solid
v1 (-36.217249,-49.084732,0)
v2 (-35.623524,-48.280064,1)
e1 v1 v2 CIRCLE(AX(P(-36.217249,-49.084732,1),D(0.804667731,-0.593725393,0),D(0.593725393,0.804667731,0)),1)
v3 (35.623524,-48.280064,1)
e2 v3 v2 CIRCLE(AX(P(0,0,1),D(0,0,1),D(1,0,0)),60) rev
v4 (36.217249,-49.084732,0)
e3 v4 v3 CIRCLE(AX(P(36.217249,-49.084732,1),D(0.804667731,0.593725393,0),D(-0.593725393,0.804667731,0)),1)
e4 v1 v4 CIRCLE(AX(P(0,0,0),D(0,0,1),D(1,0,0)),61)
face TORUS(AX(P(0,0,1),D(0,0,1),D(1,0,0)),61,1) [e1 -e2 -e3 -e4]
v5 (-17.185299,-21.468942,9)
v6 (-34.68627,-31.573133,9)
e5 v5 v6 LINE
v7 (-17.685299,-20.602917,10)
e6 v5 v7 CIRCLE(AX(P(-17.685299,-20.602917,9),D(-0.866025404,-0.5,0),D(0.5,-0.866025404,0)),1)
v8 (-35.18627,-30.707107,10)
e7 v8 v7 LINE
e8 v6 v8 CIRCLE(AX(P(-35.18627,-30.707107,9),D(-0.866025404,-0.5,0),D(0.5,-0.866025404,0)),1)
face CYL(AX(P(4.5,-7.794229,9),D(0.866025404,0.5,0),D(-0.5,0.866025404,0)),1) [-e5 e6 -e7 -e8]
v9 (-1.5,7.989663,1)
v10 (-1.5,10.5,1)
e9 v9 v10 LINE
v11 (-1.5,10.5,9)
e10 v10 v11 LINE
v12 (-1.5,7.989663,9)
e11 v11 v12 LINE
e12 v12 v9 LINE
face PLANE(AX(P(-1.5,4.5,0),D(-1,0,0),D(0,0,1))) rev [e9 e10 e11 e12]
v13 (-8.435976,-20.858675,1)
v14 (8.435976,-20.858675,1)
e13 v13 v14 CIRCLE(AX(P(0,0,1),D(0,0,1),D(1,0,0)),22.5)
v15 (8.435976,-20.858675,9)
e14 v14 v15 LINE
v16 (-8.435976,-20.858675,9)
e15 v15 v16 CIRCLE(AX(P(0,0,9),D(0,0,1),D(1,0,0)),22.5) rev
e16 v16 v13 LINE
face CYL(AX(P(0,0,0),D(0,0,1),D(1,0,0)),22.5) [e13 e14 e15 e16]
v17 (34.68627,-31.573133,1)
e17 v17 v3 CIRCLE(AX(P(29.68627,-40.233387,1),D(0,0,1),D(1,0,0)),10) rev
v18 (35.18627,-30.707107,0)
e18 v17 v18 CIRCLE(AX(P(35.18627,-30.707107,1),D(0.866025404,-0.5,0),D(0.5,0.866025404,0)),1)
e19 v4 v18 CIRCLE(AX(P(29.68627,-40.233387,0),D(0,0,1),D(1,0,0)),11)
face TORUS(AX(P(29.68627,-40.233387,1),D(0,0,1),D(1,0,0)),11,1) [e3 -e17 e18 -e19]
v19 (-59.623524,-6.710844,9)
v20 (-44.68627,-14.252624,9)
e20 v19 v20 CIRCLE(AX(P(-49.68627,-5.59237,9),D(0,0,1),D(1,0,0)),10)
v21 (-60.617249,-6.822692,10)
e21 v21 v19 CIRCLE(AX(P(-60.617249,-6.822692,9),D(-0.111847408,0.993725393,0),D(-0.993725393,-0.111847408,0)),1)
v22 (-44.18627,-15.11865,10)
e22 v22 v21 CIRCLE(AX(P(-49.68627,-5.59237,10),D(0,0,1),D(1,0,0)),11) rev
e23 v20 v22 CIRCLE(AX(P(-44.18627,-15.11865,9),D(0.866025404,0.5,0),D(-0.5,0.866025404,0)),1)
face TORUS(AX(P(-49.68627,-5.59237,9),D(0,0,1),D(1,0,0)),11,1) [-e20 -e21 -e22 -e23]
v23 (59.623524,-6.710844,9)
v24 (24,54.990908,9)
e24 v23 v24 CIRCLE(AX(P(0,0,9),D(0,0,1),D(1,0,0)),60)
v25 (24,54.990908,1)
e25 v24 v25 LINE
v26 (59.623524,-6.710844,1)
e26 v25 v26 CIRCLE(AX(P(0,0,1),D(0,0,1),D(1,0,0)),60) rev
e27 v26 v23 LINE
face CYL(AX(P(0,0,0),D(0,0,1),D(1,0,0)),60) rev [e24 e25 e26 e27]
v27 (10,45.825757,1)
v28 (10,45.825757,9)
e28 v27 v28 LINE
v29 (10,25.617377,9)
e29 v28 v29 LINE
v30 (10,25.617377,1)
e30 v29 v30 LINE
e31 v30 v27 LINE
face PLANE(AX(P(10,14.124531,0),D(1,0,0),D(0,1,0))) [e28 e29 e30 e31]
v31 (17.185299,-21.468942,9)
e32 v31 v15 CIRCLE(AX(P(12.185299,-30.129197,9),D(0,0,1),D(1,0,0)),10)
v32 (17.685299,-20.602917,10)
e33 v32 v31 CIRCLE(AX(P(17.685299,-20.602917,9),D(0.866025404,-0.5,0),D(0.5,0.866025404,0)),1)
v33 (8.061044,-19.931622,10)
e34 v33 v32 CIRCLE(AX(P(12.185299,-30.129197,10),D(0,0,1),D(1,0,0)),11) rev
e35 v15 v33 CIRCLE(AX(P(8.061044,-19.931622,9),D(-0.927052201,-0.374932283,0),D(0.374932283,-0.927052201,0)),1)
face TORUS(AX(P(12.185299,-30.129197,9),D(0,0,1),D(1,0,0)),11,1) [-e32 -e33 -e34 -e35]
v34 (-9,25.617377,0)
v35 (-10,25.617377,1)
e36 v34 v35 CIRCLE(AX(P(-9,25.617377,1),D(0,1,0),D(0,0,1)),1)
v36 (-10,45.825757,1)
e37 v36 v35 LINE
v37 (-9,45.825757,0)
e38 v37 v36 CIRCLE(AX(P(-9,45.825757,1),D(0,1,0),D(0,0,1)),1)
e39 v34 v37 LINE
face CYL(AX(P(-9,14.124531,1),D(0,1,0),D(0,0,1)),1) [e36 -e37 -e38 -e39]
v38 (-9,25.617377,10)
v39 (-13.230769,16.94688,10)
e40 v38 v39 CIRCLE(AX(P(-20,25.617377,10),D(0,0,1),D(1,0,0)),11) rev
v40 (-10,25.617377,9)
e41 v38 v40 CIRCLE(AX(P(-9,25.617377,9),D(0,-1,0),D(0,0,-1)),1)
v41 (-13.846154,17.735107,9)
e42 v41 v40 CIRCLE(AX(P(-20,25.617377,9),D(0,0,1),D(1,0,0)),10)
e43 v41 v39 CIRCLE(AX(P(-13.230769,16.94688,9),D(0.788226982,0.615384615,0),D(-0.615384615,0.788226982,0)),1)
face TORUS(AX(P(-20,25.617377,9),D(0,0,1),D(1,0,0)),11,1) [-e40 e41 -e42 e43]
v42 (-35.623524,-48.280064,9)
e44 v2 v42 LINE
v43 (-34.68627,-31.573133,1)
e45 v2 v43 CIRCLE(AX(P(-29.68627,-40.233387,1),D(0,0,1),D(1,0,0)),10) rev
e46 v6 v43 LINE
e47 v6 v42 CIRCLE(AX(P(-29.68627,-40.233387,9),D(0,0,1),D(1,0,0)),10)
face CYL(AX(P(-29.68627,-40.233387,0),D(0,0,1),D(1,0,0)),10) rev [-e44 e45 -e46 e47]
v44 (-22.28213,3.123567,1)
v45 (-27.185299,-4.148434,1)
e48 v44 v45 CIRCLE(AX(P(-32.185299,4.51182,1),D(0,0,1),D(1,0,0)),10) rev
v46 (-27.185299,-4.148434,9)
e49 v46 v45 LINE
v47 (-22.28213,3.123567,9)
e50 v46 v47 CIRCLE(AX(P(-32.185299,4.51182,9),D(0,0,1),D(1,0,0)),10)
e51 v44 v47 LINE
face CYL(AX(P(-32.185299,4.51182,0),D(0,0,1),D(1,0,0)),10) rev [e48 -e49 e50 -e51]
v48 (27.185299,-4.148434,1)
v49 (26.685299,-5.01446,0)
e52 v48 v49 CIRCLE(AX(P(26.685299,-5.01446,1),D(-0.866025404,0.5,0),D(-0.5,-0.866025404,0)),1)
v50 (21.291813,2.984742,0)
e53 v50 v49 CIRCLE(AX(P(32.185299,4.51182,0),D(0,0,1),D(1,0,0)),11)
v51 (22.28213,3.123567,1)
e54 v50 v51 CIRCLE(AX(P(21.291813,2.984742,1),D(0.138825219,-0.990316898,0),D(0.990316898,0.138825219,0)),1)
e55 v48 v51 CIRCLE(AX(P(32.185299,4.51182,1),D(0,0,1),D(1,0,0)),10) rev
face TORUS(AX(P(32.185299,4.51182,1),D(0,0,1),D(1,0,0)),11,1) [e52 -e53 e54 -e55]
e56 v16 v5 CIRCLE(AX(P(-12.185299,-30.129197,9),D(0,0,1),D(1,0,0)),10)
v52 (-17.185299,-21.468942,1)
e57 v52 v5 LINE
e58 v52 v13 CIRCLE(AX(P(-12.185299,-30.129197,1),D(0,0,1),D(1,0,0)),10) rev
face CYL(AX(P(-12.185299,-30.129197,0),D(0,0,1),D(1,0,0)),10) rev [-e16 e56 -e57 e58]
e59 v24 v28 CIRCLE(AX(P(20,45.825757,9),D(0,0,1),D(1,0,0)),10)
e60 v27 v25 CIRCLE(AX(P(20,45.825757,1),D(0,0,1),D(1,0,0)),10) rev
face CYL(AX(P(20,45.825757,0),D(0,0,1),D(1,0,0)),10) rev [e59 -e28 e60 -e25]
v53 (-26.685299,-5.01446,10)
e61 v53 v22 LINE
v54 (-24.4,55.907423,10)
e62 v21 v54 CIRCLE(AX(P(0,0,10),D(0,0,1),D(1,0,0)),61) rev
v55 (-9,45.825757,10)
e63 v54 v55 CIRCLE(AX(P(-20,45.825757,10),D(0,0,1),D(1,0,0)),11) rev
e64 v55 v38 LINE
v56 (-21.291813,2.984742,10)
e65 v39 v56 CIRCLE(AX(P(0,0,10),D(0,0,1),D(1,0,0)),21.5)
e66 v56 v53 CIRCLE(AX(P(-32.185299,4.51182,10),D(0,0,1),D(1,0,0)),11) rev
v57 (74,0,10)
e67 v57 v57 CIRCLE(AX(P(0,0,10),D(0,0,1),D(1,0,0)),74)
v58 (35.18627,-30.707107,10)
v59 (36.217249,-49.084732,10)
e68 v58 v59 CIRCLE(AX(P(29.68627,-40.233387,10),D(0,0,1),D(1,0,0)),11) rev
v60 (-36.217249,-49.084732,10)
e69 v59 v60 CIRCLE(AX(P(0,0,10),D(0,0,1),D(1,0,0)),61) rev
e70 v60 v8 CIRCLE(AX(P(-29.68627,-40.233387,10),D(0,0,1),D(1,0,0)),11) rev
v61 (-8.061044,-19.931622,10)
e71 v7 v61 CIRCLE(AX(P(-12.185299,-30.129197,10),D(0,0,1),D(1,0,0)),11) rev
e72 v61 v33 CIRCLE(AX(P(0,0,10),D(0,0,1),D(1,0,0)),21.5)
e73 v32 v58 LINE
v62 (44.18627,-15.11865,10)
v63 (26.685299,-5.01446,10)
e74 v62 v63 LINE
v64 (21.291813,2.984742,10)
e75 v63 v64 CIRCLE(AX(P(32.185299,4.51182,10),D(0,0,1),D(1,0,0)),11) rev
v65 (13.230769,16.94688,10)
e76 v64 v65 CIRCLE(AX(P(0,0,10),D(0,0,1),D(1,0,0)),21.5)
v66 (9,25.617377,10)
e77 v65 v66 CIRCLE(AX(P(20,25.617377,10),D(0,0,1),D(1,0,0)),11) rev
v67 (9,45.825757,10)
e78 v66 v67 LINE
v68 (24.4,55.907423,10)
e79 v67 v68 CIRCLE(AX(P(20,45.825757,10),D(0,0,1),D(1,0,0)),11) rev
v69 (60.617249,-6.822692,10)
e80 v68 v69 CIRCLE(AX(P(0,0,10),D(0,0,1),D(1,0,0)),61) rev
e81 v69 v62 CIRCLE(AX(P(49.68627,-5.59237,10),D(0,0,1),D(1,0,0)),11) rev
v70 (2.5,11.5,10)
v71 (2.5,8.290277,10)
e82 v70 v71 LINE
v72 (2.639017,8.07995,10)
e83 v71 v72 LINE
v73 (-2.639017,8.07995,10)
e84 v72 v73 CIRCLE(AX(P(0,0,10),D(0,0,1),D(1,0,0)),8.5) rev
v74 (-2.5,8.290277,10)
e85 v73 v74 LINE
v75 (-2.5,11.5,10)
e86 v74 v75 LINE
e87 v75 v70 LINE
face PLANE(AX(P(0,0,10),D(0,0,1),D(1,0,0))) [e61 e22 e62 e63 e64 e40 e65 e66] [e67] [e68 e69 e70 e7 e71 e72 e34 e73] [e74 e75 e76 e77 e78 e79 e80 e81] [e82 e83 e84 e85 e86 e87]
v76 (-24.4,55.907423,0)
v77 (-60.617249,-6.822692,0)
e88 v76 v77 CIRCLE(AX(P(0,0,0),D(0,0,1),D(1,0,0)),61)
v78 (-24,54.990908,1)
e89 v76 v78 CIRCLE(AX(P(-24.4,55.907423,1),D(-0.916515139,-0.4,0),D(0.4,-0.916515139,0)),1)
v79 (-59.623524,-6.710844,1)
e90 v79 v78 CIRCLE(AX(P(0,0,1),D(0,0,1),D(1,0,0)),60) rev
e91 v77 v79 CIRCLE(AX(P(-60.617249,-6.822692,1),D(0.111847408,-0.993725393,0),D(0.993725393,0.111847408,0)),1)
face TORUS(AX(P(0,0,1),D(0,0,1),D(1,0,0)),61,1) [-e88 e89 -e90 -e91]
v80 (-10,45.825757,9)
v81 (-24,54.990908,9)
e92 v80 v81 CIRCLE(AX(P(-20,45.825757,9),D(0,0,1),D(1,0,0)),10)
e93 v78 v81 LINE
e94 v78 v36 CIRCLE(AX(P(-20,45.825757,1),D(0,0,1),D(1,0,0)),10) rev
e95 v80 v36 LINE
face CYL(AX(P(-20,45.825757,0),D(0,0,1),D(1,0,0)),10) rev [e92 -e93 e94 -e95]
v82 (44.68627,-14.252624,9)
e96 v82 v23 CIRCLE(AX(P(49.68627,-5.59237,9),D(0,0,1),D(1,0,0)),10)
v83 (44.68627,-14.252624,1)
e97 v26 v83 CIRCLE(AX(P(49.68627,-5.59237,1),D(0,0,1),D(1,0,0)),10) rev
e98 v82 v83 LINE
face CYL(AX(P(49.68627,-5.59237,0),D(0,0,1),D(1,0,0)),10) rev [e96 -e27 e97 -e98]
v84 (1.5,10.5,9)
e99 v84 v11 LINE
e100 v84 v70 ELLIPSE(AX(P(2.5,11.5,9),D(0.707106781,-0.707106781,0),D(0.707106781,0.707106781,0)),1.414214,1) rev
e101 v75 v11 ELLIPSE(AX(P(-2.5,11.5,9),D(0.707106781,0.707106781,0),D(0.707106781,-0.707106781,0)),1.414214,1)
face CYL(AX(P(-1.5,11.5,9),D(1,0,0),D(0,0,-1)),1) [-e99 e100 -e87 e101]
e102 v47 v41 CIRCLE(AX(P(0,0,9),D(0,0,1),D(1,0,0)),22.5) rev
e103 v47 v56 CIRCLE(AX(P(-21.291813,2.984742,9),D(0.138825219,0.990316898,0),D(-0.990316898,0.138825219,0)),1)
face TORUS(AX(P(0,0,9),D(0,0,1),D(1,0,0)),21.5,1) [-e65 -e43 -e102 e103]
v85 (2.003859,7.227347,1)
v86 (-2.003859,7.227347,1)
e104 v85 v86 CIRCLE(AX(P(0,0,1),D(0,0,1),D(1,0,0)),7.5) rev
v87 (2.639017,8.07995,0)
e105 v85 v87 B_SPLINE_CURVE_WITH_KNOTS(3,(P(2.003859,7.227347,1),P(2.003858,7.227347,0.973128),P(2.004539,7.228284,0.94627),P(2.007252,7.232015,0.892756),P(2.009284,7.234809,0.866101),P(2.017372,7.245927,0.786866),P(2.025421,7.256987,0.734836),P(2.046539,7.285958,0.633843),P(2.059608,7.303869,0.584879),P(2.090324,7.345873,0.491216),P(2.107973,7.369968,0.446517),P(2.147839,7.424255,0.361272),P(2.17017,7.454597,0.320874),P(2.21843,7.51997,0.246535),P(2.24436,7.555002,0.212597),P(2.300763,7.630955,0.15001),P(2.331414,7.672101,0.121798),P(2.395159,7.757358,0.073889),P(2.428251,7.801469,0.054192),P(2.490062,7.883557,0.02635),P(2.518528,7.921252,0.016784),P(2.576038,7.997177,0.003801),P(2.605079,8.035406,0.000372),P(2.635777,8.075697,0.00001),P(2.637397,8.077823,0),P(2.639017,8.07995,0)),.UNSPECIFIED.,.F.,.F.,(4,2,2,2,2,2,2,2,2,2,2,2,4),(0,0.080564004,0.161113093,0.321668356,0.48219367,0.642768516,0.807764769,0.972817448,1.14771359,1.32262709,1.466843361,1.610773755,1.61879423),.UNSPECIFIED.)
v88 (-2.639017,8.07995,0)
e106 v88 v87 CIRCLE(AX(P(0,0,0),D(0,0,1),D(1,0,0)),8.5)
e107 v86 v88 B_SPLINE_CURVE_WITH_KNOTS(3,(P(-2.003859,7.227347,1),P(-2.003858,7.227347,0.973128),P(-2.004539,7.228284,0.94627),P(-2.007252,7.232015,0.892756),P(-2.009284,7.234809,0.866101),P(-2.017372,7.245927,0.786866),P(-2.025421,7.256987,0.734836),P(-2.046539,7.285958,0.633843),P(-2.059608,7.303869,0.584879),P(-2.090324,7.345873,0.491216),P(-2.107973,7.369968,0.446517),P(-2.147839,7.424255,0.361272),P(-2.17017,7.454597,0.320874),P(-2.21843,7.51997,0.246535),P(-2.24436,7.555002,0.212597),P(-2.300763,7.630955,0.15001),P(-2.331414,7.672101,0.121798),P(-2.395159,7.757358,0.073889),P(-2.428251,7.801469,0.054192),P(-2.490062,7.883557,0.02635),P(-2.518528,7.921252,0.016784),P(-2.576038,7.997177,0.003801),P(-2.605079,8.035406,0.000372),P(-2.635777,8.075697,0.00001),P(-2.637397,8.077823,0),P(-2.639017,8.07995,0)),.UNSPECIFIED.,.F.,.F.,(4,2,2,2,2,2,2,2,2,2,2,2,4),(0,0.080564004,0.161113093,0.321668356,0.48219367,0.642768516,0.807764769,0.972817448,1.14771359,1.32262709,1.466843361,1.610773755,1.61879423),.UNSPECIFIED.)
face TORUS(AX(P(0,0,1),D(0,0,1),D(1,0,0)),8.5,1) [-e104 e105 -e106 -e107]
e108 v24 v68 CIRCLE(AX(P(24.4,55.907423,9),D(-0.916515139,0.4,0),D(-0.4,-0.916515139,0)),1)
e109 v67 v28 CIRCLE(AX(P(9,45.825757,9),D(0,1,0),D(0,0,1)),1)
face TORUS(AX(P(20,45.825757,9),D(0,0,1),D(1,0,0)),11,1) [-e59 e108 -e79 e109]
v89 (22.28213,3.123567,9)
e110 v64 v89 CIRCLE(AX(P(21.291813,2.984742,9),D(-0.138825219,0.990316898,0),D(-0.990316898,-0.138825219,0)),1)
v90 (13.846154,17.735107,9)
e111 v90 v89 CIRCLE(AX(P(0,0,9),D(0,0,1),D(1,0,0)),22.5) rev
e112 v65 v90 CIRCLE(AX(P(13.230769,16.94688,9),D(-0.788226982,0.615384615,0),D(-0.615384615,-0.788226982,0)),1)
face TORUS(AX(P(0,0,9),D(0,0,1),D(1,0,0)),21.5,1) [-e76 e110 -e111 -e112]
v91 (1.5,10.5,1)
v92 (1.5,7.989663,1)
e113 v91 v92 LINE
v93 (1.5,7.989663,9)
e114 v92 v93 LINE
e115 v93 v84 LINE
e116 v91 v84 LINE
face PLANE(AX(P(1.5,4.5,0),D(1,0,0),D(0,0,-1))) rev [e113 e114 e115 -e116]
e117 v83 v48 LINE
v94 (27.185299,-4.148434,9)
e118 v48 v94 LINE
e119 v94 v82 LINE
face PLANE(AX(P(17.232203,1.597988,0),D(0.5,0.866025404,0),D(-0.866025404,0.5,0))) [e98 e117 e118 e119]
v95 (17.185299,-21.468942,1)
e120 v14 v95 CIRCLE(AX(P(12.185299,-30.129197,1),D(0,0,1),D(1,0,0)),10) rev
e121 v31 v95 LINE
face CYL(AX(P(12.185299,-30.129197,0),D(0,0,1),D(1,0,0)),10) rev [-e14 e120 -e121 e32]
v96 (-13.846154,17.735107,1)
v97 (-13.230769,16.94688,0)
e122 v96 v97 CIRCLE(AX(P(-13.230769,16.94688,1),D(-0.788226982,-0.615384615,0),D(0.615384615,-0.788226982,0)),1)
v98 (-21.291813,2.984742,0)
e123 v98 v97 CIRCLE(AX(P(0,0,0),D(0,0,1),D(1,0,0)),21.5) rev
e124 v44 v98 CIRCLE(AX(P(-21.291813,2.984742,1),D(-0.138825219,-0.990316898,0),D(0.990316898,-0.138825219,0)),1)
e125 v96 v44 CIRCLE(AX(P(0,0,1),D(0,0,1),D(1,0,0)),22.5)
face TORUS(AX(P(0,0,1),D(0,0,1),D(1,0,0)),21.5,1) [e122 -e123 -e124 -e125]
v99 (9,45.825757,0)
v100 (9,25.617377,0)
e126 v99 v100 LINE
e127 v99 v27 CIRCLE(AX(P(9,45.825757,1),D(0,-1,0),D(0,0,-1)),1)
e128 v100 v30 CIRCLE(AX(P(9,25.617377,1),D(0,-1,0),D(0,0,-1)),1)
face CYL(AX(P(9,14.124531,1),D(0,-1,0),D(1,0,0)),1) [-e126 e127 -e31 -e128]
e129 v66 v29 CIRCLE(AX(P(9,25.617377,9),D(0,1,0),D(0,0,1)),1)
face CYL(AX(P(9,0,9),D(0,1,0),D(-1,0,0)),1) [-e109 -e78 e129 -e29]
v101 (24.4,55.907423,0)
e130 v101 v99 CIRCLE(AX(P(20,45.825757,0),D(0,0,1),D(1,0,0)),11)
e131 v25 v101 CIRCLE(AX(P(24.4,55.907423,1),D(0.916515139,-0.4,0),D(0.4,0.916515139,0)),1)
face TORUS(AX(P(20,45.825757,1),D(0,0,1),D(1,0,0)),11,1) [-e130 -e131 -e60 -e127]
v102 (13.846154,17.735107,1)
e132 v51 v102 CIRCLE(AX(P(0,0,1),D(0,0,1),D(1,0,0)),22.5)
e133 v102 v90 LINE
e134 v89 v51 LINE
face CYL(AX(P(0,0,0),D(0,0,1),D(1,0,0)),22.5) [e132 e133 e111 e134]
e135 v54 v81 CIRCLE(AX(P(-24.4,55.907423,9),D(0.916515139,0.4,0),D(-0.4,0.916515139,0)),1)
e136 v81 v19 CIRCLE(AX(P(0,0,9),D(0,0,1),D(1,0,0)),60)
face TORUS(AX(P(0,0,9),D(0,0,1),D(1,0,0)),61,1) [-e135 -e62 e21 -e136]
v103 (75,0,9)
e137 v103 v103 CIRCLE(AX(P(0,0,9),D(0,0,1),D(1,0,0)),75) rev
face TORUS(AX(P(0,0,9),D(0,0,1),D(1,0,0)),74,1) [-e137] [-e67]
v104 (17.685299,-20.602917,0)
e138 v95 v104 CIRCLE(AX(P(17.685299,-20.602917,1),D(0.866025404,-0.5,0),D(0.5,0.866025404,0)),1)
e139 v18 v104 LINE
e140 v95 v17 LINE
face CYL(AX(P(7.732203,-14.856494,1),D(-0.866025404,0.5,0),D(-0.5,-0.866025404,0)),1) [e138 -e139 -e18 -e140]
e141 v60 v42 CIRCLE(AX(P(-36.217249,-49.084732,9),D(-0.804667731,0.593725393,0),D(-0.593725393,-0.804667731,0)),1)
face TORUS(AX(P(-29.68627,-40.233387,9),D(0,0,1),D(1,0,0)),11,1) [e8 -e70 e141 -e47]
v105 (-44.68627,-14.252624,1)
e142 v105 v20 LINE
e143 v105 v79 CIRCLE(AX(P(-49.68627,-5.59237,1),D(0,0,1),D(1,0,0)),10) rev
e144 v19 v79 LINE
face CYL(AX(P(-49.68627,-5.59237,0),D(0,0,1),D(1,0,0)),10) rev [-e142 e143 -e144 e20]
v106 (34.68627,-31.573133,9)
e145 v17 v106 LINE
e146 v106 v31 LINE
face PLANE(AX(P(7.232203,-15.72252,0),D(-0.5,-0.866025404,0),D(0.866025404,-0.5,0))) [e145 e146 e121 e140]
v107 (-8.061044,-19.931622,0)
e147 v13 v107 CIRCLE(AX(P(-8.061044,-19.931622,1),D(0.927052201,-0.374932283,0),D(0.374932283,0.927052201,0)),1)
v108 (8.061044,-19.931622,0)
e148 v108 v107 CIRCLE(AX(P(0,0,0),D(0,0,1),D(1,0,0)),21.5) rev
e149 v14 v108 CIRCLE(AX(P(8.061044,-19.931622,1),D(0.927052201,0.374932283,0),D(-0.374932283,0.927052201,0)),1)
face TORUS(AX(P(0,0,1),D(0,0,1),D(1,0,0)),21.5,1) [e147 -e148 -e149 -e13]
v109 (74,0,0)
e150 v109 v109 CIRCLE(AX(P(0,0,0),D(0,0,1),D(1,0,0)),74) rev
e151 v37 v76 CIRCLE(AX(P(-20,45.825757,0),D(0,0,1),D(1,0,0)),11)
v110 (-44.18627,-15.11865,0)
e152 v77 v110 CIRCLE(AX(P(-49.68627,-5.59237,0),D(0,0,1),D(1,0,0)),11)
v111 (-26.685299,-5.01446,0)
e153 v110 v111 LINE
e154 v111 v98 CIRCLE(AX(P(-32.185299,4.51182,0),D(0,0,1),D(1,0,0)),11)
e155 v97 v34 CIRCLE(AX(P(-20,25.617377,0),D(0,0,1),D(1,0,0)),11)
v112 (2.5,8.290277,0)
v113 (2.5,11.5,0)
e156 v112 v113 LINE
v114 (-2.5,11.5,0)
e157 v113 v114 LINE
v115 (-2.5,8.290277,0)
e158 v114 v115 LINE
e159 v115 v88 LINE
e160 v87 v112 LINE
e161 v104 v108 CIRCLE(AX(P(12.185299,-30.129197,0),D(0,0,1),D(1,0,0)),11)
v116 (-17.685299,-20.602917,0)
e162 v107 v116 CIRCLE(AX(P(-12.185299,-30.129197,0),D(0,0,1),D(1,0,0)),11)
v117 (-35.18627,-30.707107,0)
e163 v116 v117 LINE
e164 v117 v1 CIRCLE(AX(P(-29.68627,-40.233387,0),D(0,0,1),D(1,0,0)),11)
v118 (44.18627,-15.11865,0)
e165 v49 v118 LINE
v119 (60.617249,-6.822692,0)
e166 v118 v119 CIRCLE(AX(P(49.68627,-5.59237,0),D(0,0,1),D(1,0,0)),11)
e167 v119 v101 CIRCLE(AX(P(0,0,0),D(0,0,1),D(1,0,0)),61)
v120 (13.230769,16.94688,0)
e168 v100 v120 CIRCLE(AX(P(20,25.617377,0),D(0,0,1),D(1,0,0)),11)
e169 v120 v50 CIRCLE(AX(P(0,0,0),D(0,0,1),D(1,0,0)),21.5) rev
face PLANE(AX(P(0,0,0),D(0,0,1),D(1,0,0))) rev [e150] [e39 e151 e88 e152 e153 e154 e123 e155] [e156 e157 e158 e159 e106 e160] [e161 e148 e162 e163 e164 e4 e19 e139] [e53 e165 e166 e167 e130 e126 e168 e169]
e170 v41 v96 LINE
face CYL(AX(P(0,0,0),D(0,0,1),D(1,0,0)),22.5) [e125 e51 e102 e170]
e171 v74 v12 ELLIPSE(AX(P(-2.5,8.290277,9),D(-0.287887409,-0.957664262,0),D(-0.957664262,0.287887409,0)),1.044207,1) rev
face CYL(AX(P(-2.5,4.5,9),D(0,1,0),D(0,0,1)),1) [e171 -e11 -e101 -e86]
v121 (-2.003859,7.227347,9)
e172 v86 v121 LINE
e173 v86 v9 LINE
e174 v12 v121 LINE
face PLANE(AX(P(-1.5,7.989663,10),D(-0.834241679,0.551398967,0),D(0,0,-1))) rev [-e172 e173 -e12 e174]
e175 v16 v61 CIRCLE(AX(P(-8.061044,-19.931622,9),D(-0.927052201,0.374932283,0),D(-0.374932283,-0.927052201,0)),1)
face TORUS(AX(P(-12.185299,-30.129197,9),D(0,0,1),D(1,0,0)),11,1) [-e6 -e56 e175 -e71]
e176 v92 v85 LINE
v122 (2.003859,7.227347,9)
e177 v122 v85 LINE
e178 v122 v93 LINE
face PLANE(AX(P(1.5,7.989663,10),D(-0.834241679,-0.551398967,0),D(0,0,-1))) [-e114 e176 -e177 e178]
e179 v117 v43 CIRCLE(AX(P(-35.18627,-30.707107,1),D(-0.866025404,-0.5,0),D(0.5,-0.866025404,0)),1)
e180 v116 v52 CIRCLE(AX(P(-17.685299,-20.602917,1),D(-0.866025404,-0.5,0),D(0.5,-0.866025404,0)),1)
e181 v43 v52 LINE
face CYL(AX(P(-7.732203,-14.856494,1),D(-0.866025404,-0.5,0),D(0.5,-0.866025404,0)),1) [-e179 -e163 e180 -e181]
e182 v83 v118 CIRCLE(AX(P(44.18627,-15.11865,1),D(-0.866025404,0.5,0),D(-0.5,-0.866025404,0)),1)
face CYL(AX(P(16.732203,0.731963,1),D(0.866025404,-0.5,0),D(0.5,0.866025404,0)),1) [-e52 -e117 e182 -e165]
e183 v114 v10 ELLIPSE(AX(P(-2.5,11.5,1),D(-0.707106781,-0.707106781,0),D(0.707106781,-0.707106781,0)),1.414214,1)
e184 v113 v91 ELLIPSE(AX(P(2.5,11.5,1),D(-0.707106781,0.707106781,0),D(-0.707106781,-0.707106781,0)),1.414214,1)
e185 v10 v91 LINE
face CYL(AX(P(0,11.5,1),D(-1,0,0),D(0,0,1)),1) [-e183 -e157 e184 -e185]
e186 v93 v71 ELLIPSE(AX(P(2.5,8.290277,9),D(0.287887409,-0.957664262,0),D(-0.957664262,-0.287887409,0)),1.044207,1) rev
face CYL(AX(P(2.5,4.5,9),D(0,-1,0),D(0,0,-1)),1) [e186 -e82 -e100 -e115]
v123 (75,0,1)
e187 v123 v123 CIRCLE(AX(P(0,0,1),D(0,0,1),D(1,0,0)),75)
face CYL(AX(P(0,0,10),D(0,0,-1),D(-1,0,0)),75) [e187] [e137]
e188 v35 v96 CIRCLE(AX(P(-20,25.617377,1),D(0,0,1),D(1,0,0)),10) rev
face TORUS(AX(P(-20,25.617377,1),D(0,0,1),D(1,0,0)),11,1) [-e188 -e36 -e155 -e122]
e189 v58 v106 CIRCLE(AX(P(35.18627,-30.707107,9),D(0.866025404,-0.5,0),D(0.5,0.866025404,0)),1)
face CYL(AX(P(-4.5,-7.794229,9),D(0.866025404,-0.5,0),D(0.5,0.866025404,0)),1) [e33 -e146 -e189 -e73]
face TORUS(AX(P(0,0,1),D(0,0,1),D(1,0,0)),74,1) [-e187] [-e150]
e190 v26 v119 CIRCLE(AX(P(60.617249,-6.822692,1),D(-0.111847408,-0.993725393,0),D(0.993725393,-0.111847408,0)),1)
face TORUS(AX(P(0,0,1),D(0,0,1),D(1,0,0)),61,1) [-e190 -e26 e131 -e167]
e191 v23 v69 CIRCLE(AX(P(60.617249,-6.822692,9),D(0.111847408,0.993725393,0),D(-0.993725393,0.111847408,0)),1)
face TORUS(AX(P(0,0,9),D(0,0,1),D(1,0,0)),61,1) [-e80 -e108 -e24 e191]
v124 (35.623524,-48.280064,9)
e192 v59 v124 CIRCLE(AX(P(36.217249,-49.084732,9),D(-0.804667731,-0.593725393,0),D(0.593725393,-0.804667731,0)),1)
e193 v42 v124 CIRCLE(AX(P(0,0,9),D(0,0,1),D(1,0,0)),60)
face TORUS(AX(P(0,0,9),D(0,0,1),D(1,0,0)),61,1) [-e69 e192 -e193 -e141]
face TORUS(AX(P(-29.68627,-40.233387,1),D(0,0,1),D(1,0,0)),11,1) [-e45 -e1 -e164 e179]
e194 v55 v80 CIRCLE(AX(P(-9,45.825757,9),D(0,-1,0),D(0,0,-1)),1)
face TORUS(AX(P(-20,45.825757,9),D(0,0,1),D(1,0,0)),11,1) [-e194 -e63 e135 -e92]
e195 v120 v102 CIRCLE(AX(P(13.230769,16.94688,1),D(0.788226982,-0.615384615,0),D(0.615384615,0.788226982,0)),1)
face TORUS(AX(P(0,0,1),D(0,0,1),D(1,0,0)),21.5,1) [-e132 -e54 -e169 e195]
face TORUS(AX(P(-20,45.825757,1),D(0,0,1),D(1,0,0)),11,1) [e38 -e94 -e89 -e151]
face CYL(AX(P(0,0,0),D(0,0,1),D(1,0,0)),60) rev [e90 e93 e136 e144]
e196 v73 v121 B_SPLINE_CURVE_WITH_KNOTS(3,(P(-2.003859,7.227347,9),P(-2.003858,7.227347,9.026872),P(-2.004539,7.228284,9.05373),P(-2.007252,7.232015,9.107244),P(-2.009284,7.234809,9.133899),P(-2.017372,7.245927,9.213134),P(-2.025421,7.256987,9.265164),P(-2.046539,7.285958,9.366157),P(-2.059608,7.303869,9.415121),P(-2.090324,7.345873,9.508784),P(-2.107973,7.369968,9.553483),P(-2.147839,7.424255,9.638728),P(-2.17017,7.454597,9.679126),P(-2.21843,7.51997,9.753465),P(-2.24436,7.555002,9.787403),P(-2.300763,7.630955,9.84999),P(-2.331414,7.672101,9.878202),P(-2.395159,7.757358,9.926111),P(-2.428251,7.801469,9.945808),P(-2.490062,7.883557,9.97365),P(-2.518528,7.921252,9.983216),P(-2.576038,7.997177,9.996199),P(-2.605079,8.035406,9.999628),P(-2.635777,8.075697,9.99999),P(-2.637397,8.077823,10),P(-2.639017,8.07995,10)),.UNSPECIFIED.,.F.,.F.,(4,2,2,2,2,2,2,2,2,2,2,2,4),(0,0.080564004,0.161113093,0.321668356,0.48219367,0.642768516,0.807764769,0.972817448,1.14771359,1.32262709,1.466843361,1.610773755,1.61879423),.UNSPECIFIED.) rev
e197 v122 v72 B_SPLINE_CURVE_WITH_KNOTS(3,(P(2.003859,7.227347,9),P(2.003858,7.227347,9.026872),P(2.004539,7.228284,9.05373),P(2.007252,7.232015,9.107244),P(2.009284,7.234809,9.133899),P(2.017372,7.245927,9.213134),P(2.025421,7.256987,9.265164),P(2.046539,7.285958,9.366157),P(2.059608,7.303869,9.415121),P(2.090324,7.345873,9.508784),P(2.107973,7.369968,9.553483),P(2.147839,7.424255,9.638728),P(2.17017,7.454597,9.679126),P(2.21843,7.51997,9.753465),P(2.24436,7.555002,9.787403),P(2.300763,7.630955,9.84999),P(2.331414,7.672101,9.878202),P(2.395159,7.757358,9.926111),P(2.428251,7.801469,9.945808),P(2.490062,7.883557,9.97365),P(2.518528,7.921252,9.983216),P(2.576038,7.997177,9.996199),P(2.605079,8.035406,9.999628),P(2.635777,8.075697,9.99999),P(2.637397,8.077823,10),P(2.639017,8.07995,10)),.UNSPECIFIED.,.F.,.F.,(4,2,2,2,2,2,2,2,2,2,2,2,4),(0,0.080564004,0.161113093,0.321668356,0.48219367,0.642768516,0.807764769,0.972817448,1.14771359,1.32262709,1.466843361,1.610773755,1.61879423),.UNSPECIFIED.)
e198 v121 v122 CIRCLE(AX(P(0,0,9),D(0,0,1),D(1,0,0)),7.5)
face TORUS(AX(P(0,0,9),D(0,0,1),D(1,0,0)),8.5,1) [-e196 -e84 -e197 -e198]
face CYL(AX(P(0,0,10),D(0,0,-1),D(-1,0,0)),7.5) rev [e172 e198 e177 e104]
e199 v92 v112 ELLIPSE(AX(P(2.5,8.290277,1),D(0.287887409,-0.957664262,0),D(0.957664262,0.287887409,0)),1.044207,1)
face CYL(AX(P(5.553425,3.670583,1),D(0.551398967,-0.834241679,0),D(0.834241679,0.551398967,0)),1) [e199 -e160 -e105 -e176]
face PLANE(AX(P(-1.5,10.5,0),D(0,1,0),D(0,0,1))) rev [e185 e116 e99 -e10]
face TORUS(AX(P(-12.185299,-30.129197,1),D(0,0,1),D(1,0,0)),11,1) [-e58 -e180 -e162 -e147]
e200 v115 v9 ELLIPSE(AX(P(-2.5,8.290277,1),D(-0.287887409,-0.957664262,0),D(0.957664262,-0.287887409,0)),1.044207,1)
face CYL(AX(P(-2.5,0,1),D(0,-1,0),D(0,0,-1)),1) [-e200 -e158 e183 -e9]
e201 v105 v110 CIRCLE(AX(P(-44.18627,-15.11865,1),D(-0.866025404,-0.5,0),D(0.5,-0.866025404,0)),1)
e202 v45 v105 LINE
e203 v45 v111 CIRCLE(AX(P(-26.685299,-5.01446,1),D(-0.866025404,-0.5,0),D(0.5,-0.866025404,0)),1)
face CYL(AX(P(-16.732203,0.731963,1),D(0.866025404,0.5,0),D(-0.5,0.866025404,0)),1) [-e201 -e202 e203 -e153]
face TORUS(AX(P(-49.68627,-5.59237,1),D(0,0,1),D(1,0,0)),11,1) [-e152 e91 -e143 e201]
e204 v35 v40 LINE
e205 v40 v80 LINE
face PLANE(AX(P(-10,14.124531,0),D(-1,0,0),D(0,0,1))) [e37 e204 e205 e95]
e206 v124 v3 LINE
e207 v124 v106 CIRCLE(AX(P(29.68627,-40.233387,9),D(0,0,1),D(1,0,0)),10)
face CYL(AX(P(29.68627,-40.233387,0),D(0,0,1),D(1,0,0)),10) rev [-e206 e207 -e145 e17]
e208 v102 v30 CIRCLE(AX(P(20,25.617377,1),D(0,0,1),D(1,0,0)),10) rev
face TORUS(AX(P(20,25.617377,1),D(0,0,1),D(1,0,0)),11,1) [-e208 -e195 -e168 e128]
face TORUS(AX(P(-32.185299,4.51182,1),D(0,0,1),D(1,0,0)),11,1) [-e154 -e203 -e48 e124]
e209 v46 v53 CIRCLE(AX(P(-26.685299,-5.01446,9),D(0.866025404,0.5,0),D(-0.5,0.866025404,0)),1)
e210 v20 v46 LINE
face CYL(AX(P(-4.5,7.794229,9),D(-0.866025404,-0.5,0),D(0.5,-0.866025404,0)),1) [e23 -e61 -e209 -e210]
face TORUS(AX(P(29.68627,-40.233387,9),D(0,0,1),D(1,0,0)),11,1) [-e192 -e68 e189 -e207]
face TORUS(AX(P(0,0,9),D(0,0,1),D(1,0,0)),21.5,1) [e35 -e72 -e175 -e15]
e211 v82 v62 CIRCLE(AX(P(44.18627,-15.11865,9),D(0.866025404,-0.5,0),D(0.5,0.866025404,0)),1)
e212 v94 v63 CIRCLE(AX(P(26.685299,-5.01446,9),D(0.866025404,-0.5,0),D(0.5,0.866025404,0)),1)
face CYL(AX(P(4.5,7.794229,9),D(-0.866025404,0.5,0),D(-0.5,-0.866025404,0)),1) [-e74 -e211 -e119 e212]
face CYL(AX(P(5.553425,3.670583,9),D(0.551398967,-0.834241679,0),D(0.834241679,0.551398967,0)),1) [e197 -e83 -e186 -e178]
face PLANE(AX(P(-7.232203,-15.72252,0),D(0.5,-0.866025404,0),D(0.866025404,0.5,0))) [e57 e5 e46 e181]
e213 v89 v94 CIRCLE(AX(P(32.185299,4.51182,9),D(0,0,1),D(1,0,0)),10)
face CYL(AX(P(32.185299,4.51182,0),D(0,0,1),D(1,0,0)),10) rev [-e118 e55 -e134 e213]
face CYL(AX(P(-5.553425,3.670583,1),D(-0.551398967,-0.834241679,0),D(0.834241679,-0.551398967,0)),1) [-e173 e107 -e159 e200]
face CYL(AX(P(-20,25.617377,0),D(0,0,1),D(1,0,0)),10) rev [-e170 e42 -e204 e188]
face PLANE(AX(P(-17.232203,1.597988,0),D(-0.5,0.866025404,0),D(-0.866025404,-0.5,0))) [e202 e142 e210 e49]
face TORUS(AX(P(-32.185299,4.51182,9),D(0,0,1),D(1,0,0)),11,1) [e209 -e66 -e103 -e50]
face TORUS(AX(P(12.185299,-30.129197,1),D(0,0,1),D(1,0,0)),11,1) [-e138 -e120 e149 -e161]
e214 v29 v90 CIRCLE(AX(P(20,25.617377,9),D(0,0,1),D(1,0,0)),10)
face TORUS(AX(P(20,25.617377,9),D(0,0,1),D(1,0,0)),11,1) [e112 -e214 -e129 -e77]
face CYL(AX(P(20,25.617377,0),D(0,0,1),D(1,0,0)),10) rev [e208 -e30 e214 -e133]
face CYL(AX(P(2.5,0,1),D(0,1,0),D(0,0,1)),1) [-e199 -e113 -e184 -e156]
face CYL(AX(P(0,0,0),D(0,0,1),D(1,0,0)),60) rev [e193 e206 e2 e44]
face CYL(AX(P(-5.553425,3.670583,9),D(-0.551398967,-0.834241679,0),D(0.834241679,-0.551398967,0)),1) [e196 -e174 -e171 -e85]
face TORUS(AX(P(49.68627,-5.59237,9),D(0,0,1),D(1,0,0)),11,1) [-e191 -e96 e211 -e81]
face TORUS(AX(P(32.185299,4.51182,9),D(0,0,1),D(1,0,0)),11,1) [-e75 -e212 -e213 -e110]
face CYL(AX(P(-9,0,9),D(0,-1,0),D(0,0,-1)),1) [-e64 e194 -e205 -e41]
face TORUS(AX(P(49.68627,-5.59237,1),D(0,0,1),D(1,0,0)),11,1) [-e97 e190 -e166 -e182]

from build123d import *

# Parameters (mm, degrees)
SKETCH_1_R                       = 75
SKETCH_1_R_2                     = 7.5
EXTRUDE_1_DEPTH                  = 10
SKETCH_2_R                       = 60
SKETCH_2_R_2                     = 22.5
CUT_EXTRUDE_1_DEPTH              = 10
SKETCH_3_W                       = 20
SKETCH_3_H                       = 50.508839172
EXTRUDE_2_DEPTH                  = 10
FILLET_1_R                       = 10
PATTERN_CIRCULAR_1_COUNT         = 3
FILLET_1_OF_PATTERN_CIRCULAR_1_R = 10
SKETCH_4_W                       = 3
SKETCH_4_H                       = 6
CUT_EXTRUDE_2_DEPTH              = 10
CHAMFER_1_SIZE                   = 0.641193422
FILLET_2_R                       = 1


with BuildPart() as part:
    # 草图1 → 凸台-拉伸1 (new body)
    with BuildSketch(Plane.XY):
        Circle(SKETCH_1_R)
        Circle(SKETCH_1_R_2, mode=Mode.SUBTRACT)
    extrude(amount=EXTRUDE_1_DEPTH)

    # 草图2 → 切除-拉伸1 (cut)
    with BuildSketch(Plane.XY.offset(10)):
        Circle(SKETCH_2_R)
        Circle(SKETCH_2_R_2, mode=Mode.SUBTRACT)
    extrude(amount=-CUT_EXTRUDE_1_DEPTH, mode=Mode.SUBTRACT)


with BuildPart() as cut_extrude_1_piece_1:
    # of the separate pieces the step leaves, piece 1, a body of its own (cut_extrude_1_pieces)
    add(part.part.solids().sort_by_distance((75, 0, 0))[0])



with BuildPart() as cut_extrude_1_piece_2:
    # of the separate pieces the step leaves, piece 2, a body of its own (cut_extrude_1_pieces)
    add(part.part.solids().sort_by_distance((22.5, 0, 0))[0])


with BuildPart() as cut_extrude_1_piece_1_1:
    add(cut_extrude_1_piece_1.part)

    add(cut_extrude_1_piece_2.part)  # 凸台-拉伸2 merges 切除-拉伸1 piece 2
    # 草图3 → 凸台-拉伸2 (add)
    with BuildSketch(Plane.XY.offset(10)):
        with Locations((0, 39.378950702)):
            Rectangle(SKETCH_3_W, SKETCH_3_H)
    extrude_2 = extrude(amount=-EXTRUDE_2_DEPTH)

    # 圆角1
    fillet_1_edges = [cut_extrude_1_piece_1_1.edges().sort_by_distance(p)[0] for p in [
        (-10, 20.155644371, 5),
        (10, 20.155644371, 5),
        (-10, 59.160797831, 5),
        (10, 59.160797831, 5),
    ]]
    fillet(fillet_1_edges, radius=FILLET_1_R)

    # 阵列(圆周)1: 凸台-拉伸2 ×3 about axis
    pattern_circular_1_axis = Axis((0, 0, 0), (0, 0, 1))
    for i in range(1, PATTERN_CIRCULAR_1_COUNT):
        add(extrude_2.rotate(pattern_circular_1_axis, i * 360 / PATTERN_CIRCULAR_1_COUNT))

    # 圆角1 of 阵列(圆周)1
    fillet_1_of_pattern_circular_1_edges = [cut_extrude_1_piece_1_1.edges().sort_by_distance(p)[0] for p in [
        (-12.455300055, -18.738076223, 5),
        (-22.455300055, -1.417568148, 5),
        (-46.23475383, -38.240652953, 5),
        (-56.23475383, -20.920144878, 5),
        (22.455300055, -1.417568148, 5),
        (12.455300055, -18.738076223, 5),
        (56.23475383, -20.920144878, 5),
        (46.23475383, -38.240652953, 5),
    ]]
    fillet(fillet_1_of_pattern_circular_1_edges, radius=FILLET_1_OF_PATTERN_CIRCULAR_1_R)

    # 草图4 → 切除-拉伸2 (cut)
    with BuildSketch(Plane.XY.offset(10)):
        with Locations((0, 7.5)):
            Rectangle(SKETCH_4_W, SKETCH_4_H)
    extrude(amount=-CUT_EXTRUDE_2_DEPTH, mode=Mode.SUBTRACT)

    # 倒角1
    # the kernel refuses this chamfer: 0.641193422, 0.5 mm, written as the material it takes off along each edge
    with BuildSketch(Plane(origin=(-1.5, 7.348469228, 11.656851848), x_dir=(0, 1, 0), z_dir=(0, 0, -1))) as chamfer_1_piece_1:
        with BuildLine():
            Line((CHAMFER_1_SIZE, 0), (-0.121121804, -0.50385858))
            ThreePointArc((-0.121121804, -0.50385858), (-0.058408813, -0.262106449), (0, 0))
            Line((0, 0), (CHAMFER_1_SIZE, 0))
        make_face()
    extrude(amount=13.313703696, mode=Mode.SUBTRACT)
    with BuildSketch(Plane(origin=(1.5, 7.348469228, 11.656851848), x_dir=(0.9723015182925395, -0.233730095464881, 0), z_dir=(0, 0, -1))) as chamfer_1_piece_2:
        with BuildLine():
            Line((0.518212274, 0), (-CHAMFER_1_SIZE * 0.23373009559, -CHAMFER_1_SIZE * 0.972301518814))
            Line((-CHAMFER_1_SIZE * 0.23373009559, -CHAMFER_1_SIZE * 0.972301518814), (0, 0))
            ThreePointArc((0, 0), (0.268498395, -0.004471188), (0.518212274, 0))
        make_face()
    extrude(amount=13.313703696, mode=Mode.SUBTRACT)

    # 圆角2
    fillet_2_edges = [cut_extrude_1_piece_1_1.edges().sort_by_distance(p)[0] for p in [
        (-75, 0, 0),
        (0, -60, 10),
        (0, -60, 0),
        (-25.935784426, -26.521037504, 0),
        (-25.935784426, -26.521037504, 10),
        (-35.935784426, -9.200529428, 10),
        (-35.935784426, -9.200529428, 0),
        (0, -22.5, 10),
        (0, -22.5, 0),
        (-39.670570827, -39.673270193, 10),
        (-39.670570827, -39.673270193, 0),
        (-54.193345252, -14.519087022, 0),
        (-54.193345252, -14.519087022, 10),
        (-23.893941389, -1.078653158, 0),
        (-23.893941389, -1.078653158, 10),
        (-12.881111731, -20.15343366, 10),
        (-12.881111731, -20.15343366, 0),
        (51.961524227, 30, 0),
        (51.961524227, 30, 10),
        (35.935784426, -9.200529428, 0),
        (35.935784426, -9.200529428, 10),
        (25.935784426, -26.521037504, 10),
        (25.935784426, -26.521037504, 0),
        (19.485571585, 11.25, 0),
        (19.485571585, 11.25, 10),
        (54.193345252, -14.519087022, 10),
        (54.193345252, -14.519087022, 0),
        (39.670570827, -39.673270193, 0),
        (39.670570827, -39.673270193, 10),
        (12.881111731, -20.15343366, 0),
        (12.881111731, -20.15343366, 10),
        (23.893941389, -1.078653158, 10),
        (23.893941389, -1.078653158, 0),
        (-1.5, 9.244831325, 0),
        (0, 10.5, 0),
        (-1.5, 9.244831325, 10),
        (0, 10.5, 10),
        (1.5, 9.244831325, 10),
        (1.5, 9.244831325, 0),
        (0, -7.5, 10),
        (-1.75192929, 7.608505037, 10),
        (1.75192929, 7.608505037, 10),
        (0, -7.5, 0),
        (-1.75192929, 7.608505037, 0),
        (1.75192929, 7.608505037, 0),
        (-51.961524227, 30, 10),
        (-51.961524227, 30, 0),
        (-10, 35.721566932, 10),
        (-10, 35.721566932, 0),
        (10, 35.721566932, 0),
        (10, 35.721566932, 10),
        (-19.485571585, 11.25, 0),
        (-19.485571585, 11.25, 10),
        (-14.522774425, 54.192357215, 10),
        (-14.522774425, 54.192357215, 0),
        (14.522774425, 54.192357215, 0),
        (14.522774425, 54.192357215, 10),
        (11.012829657, 21.232086818, 10),
        (11.012829657, 21.232086818, 0),
        (-11.012829657, 21.232086818, 0),
        (-11.012829657, 21.232086818, 10),
        (-75, 0, 10),
    ]]
    fillet(fillet_2_edges, radius=FILLET_2_R)


solid = cut_extrude_1_piece_1_1.part
